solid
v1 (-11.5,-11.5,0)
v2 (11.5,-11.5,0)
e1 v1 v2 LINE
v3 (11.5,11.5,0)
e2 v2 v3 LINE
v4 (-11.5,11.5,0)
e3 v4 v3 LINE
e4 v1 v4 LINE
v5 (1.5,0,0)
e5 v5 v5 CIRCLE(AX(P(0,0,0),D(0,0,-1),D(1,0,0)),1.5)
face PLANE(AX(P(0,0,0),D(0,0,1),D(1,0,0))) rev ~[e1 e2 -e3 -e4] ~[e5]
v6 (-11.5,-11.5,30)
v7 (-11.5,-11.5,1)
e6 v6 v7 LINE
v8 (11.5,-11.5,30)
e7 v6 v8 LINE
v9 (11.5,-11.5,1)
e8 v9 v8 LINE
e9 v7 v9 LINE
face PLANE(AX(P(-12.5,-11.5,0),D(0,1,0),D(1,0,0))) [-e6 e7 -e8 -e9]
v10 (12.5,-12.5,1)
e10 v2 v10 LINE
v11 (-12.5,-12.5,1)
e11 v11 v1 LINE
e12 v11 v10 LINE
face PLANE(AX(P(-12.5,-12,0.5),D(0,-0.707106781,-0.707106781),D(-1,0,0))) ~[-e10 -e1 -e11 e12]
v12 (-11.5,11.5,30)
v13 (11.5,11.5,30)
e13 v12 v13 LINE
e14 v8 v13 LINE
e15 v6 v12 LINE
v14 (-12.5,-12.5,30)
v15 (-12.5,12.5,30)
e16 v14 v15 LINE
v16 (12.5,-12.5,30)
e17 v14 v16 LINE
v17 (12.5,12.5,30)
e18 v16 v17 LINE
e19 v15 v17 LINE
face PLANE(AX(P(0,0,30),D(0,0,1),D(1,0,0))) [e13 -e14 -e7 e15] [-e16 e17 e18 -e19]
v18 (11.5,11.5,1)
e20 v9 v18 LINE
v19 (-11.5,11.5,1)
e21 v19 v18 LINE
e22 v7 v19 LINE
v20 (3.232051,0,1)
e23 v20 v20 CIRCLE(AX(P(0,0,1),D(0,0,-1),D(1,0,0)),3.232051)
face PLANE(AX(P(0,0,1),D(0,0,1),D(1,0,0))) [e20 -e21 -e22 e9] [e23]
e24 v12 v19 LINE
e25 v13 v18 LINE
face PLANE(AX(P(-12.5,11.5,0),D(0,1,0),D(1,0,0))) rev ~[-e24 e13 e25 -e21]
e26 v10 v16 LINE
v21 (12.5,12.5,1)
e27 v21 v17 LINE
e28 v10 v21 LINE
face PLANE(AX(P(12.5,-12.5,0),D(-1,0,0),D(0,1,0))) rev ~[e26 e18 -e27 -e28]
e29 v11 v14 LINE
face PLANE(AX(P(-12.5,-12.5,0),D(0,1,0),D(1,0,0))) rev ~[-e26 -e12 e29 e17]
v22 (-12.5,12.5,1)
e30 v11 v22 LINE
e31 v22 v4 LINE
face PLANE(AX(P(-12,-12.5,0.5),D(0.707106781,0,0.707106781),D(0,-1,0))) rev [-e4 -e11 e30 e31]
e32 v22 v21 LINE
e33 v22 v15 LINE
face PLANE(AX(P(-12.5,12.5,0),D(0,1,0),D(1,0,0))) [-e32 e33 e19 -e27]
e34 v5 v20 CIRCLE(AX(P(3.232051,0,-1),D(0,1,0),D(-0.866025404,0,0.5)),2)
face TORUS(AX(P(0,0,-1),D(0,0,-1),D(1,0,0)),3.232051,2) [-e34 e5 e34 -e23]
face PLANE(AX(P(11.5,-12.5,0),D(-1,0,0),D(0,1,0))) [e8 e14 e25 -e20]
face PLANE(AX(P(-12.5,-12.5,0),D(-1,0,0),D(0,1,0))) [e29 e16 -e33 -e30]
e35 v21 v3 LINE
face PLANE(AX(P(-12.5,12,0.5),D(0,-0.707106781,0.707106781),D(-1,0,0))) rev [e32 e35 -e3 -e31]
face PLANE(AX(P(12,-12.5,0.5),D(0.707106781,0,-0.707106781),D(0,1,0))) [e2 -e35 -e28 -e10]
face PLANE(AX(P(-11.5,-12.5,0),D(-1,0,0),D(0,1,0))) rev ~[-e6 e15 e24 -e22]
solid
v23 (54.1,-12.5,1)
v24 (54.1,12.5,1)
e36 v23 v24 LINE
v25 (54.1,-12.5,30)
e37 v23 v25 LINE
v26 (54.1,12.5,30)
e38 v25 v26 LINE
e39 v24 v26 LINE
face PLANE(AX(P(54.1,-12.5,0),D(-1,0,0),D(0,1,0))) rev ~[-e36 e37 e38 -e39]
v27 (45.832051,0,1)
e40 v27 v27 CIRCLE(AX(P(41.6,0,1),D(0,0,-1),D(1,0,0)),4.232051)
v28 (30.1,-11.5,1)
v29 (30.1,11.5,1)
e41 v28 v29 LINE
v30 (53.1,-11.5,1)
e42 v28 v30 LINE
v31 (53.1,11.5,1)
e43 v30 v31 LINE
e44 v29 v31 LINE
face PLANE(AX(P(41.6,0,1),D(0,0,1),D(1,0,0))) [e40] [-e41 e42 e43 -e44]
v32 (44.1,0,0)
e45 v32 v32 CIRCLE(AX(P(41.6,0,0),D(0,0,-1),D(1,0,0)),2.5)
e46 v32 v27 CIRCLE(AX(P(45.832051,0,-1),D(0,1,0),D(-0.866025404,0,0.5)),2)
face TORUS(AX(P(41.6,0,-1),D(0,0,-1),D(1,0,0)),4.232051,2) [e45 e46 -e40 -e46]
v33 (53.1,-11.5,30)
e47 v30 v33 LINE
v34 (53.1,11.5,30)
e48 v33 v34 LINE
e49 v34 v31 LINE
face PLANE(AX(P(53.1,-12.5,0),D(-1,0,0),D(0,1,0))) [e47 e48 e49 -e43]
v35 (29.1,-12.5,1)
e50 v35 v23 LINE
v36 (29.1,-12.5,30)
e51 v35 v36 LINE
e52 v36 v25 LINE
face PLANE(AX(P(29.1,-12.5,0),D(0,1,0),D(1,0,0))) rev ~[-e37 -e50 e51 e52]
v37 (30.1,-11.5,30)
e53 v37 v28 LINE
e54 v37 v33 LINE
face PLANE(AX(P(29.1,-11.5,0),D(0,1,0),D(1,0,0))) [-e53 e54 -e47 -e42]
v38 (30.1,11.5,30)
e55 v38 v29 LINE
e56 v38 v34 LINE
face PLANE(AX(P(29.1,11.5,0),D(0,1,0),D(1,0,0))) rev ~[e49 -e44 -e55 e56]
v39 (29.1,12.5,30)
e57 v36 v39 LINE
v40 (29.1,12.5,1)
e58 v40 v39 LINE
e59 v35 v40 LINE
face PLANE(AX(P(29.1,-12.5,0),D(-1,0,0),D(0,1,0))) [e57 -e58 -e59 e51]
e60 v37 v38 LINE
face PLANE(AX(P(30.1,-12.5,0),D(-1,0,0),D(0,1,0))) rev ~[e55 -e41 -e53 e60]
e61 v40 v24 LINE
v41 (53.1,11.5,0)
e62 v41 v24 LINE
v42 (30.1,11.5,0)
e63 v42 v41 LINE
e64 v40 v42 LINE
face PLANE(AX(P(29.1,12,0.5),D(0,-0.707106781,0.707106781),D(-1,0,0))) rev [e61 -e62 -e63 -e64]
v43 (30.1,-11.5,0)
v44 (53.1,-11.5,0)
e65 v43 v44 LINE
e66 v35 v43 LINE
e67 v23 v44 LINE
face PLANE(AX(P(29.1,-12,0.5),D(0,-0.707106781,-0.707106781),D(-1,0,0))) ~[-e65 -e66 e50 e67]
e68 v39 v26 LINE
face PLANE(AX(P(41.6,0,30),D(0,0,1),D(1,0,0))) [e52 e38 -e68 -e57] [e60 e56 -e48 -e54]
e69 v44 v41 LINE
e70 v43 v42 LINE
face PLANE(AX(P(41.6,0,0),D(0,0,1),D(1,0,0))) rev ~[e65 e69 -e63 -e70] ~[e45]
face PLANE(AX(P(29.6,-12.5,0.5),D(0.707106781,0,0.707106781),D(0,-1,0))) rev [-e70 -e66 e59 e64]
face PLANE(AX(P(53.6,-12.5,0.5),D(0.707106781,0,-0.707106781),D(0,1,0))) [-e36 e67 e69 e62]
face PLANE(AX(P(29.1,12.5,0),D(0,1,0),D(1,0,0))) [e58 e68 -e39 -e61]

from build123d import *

# Parameters (mm, degrees)
F0_W      = 25
F0_H      = 25
F1_DEPTH  = 30
F2_T      = -1
F4_R      = 1.5
F4_R_2    = 2.5
F5_DEPTH  = 30.001
F7_SIZE   = 1
F7_2_SIZE = 1


# Not quite as in the source:
# - a fillet or chamfer that OpenCascade refuses, or shapes differently, is made with other operations: its cross-section is extruded or revolved along the edge and cut away or added


with BuildPart() as f1:
    # F0 (on Top) → F1 (new body)
    with BuildSketch(Plane.XY):
        Rectangle(F0_W, F0_H)
    extrude(amount=F1_DEPTH)

    # F2
    f2_openings = [f1.faces().sort_by_distance(p)[0] for p in [
        (0, 0, 30),
    ]]
    offset(amount=F2_T, openings=f2_openings)


with BuildPart() as f3_1:
    # F3: copy of F1
    add(f1.part.moved(Location((41.6, 0, 0))))


with BuildPart() as f5_tool:
    # F4 (on face) → F5 (new body, through all)
    with BuildSketch(Plane(origin=(0, 0, 0), x_dir=(1, 0, 0), z_dir=(0, 0, -1))):
        Circle(F4_R)
        with Locations((41.6, 0)):
            Circle(F4_R_2)
    extrude(amount=-F5_DEPTH)


with BuildPart() as f1_1:
    add(f1.part)

    # F5: cut by f5_tool
    add(f5_tool.part, mode=Mode.SUBTRACT)

    # F6: fillet of radius 2 on 1 edges, made by hand

    # F6_s1 → F6_t2 (revolve, cut)
    with BuildSketch(Plane.XZ):
        with BuildLine():
            ThreePointArc((1.5, 0), (2.2320508076, 0.7320508076), (3.2320508076, 1))
            Line((3.2320508076, 1), (1.5, 1))
            Line((1.5, 1), (1.5, 0))
        make_face()
    revolve(axis=Axis((0, 0, 1), (0, 0, -1)), mode=Mode.SUBTRACT)

    # F7
    f7_edges = [f1_1.edges().sort_by_distance(p)[0] for p in [
        (-12.5, 0, 0),
        (0, 12.5, 0),
        (12.5, 0, 0),
        (0, -12.5, 0),
    ]]
    chamfer(f7_edges, length=F7_SIZE)


with BuildPart() as f3_1_1:
    add(f3_1.part)

    # F5: cut by f5_tool
    add(f5_tool.part, mode=Mode.SUBTRACT)

    # F6#2: fillet of radius 2 on 1 edges, made by hand

    # F6_2_s1 → F6_2_t2 (revolve, cut)
    with BuildSketch(Plane.XZ):
        with BuildLine():
            ThreePointArc((44.1, 0), (44.8320508076, 0.7320508076), (45.8320508076, 1))
            Line((45.8320508076, 1), (44.1, 1))
            Line((44.1, 1), (44.1, 0))
        make_face()
    revolve(axis=Axis((41.6, 0, 1), (0, 0, -1)), mode=Mode.SUBTRACT)

    # F7#2
    f7_2_edges = [f3_1_1.edges().sort_by_distance(p)[0] for p in [
        (41.6, -12.5, 0),
        (29.1, 0, 0),
        (54.1, 0, 0),
        (41.6, 12.5, 0),
    ]]
    chamfer(f7_2_edges, length=F7_2_SIZE)


solid = Compound([f1_1.part, f3_1_1.part])
